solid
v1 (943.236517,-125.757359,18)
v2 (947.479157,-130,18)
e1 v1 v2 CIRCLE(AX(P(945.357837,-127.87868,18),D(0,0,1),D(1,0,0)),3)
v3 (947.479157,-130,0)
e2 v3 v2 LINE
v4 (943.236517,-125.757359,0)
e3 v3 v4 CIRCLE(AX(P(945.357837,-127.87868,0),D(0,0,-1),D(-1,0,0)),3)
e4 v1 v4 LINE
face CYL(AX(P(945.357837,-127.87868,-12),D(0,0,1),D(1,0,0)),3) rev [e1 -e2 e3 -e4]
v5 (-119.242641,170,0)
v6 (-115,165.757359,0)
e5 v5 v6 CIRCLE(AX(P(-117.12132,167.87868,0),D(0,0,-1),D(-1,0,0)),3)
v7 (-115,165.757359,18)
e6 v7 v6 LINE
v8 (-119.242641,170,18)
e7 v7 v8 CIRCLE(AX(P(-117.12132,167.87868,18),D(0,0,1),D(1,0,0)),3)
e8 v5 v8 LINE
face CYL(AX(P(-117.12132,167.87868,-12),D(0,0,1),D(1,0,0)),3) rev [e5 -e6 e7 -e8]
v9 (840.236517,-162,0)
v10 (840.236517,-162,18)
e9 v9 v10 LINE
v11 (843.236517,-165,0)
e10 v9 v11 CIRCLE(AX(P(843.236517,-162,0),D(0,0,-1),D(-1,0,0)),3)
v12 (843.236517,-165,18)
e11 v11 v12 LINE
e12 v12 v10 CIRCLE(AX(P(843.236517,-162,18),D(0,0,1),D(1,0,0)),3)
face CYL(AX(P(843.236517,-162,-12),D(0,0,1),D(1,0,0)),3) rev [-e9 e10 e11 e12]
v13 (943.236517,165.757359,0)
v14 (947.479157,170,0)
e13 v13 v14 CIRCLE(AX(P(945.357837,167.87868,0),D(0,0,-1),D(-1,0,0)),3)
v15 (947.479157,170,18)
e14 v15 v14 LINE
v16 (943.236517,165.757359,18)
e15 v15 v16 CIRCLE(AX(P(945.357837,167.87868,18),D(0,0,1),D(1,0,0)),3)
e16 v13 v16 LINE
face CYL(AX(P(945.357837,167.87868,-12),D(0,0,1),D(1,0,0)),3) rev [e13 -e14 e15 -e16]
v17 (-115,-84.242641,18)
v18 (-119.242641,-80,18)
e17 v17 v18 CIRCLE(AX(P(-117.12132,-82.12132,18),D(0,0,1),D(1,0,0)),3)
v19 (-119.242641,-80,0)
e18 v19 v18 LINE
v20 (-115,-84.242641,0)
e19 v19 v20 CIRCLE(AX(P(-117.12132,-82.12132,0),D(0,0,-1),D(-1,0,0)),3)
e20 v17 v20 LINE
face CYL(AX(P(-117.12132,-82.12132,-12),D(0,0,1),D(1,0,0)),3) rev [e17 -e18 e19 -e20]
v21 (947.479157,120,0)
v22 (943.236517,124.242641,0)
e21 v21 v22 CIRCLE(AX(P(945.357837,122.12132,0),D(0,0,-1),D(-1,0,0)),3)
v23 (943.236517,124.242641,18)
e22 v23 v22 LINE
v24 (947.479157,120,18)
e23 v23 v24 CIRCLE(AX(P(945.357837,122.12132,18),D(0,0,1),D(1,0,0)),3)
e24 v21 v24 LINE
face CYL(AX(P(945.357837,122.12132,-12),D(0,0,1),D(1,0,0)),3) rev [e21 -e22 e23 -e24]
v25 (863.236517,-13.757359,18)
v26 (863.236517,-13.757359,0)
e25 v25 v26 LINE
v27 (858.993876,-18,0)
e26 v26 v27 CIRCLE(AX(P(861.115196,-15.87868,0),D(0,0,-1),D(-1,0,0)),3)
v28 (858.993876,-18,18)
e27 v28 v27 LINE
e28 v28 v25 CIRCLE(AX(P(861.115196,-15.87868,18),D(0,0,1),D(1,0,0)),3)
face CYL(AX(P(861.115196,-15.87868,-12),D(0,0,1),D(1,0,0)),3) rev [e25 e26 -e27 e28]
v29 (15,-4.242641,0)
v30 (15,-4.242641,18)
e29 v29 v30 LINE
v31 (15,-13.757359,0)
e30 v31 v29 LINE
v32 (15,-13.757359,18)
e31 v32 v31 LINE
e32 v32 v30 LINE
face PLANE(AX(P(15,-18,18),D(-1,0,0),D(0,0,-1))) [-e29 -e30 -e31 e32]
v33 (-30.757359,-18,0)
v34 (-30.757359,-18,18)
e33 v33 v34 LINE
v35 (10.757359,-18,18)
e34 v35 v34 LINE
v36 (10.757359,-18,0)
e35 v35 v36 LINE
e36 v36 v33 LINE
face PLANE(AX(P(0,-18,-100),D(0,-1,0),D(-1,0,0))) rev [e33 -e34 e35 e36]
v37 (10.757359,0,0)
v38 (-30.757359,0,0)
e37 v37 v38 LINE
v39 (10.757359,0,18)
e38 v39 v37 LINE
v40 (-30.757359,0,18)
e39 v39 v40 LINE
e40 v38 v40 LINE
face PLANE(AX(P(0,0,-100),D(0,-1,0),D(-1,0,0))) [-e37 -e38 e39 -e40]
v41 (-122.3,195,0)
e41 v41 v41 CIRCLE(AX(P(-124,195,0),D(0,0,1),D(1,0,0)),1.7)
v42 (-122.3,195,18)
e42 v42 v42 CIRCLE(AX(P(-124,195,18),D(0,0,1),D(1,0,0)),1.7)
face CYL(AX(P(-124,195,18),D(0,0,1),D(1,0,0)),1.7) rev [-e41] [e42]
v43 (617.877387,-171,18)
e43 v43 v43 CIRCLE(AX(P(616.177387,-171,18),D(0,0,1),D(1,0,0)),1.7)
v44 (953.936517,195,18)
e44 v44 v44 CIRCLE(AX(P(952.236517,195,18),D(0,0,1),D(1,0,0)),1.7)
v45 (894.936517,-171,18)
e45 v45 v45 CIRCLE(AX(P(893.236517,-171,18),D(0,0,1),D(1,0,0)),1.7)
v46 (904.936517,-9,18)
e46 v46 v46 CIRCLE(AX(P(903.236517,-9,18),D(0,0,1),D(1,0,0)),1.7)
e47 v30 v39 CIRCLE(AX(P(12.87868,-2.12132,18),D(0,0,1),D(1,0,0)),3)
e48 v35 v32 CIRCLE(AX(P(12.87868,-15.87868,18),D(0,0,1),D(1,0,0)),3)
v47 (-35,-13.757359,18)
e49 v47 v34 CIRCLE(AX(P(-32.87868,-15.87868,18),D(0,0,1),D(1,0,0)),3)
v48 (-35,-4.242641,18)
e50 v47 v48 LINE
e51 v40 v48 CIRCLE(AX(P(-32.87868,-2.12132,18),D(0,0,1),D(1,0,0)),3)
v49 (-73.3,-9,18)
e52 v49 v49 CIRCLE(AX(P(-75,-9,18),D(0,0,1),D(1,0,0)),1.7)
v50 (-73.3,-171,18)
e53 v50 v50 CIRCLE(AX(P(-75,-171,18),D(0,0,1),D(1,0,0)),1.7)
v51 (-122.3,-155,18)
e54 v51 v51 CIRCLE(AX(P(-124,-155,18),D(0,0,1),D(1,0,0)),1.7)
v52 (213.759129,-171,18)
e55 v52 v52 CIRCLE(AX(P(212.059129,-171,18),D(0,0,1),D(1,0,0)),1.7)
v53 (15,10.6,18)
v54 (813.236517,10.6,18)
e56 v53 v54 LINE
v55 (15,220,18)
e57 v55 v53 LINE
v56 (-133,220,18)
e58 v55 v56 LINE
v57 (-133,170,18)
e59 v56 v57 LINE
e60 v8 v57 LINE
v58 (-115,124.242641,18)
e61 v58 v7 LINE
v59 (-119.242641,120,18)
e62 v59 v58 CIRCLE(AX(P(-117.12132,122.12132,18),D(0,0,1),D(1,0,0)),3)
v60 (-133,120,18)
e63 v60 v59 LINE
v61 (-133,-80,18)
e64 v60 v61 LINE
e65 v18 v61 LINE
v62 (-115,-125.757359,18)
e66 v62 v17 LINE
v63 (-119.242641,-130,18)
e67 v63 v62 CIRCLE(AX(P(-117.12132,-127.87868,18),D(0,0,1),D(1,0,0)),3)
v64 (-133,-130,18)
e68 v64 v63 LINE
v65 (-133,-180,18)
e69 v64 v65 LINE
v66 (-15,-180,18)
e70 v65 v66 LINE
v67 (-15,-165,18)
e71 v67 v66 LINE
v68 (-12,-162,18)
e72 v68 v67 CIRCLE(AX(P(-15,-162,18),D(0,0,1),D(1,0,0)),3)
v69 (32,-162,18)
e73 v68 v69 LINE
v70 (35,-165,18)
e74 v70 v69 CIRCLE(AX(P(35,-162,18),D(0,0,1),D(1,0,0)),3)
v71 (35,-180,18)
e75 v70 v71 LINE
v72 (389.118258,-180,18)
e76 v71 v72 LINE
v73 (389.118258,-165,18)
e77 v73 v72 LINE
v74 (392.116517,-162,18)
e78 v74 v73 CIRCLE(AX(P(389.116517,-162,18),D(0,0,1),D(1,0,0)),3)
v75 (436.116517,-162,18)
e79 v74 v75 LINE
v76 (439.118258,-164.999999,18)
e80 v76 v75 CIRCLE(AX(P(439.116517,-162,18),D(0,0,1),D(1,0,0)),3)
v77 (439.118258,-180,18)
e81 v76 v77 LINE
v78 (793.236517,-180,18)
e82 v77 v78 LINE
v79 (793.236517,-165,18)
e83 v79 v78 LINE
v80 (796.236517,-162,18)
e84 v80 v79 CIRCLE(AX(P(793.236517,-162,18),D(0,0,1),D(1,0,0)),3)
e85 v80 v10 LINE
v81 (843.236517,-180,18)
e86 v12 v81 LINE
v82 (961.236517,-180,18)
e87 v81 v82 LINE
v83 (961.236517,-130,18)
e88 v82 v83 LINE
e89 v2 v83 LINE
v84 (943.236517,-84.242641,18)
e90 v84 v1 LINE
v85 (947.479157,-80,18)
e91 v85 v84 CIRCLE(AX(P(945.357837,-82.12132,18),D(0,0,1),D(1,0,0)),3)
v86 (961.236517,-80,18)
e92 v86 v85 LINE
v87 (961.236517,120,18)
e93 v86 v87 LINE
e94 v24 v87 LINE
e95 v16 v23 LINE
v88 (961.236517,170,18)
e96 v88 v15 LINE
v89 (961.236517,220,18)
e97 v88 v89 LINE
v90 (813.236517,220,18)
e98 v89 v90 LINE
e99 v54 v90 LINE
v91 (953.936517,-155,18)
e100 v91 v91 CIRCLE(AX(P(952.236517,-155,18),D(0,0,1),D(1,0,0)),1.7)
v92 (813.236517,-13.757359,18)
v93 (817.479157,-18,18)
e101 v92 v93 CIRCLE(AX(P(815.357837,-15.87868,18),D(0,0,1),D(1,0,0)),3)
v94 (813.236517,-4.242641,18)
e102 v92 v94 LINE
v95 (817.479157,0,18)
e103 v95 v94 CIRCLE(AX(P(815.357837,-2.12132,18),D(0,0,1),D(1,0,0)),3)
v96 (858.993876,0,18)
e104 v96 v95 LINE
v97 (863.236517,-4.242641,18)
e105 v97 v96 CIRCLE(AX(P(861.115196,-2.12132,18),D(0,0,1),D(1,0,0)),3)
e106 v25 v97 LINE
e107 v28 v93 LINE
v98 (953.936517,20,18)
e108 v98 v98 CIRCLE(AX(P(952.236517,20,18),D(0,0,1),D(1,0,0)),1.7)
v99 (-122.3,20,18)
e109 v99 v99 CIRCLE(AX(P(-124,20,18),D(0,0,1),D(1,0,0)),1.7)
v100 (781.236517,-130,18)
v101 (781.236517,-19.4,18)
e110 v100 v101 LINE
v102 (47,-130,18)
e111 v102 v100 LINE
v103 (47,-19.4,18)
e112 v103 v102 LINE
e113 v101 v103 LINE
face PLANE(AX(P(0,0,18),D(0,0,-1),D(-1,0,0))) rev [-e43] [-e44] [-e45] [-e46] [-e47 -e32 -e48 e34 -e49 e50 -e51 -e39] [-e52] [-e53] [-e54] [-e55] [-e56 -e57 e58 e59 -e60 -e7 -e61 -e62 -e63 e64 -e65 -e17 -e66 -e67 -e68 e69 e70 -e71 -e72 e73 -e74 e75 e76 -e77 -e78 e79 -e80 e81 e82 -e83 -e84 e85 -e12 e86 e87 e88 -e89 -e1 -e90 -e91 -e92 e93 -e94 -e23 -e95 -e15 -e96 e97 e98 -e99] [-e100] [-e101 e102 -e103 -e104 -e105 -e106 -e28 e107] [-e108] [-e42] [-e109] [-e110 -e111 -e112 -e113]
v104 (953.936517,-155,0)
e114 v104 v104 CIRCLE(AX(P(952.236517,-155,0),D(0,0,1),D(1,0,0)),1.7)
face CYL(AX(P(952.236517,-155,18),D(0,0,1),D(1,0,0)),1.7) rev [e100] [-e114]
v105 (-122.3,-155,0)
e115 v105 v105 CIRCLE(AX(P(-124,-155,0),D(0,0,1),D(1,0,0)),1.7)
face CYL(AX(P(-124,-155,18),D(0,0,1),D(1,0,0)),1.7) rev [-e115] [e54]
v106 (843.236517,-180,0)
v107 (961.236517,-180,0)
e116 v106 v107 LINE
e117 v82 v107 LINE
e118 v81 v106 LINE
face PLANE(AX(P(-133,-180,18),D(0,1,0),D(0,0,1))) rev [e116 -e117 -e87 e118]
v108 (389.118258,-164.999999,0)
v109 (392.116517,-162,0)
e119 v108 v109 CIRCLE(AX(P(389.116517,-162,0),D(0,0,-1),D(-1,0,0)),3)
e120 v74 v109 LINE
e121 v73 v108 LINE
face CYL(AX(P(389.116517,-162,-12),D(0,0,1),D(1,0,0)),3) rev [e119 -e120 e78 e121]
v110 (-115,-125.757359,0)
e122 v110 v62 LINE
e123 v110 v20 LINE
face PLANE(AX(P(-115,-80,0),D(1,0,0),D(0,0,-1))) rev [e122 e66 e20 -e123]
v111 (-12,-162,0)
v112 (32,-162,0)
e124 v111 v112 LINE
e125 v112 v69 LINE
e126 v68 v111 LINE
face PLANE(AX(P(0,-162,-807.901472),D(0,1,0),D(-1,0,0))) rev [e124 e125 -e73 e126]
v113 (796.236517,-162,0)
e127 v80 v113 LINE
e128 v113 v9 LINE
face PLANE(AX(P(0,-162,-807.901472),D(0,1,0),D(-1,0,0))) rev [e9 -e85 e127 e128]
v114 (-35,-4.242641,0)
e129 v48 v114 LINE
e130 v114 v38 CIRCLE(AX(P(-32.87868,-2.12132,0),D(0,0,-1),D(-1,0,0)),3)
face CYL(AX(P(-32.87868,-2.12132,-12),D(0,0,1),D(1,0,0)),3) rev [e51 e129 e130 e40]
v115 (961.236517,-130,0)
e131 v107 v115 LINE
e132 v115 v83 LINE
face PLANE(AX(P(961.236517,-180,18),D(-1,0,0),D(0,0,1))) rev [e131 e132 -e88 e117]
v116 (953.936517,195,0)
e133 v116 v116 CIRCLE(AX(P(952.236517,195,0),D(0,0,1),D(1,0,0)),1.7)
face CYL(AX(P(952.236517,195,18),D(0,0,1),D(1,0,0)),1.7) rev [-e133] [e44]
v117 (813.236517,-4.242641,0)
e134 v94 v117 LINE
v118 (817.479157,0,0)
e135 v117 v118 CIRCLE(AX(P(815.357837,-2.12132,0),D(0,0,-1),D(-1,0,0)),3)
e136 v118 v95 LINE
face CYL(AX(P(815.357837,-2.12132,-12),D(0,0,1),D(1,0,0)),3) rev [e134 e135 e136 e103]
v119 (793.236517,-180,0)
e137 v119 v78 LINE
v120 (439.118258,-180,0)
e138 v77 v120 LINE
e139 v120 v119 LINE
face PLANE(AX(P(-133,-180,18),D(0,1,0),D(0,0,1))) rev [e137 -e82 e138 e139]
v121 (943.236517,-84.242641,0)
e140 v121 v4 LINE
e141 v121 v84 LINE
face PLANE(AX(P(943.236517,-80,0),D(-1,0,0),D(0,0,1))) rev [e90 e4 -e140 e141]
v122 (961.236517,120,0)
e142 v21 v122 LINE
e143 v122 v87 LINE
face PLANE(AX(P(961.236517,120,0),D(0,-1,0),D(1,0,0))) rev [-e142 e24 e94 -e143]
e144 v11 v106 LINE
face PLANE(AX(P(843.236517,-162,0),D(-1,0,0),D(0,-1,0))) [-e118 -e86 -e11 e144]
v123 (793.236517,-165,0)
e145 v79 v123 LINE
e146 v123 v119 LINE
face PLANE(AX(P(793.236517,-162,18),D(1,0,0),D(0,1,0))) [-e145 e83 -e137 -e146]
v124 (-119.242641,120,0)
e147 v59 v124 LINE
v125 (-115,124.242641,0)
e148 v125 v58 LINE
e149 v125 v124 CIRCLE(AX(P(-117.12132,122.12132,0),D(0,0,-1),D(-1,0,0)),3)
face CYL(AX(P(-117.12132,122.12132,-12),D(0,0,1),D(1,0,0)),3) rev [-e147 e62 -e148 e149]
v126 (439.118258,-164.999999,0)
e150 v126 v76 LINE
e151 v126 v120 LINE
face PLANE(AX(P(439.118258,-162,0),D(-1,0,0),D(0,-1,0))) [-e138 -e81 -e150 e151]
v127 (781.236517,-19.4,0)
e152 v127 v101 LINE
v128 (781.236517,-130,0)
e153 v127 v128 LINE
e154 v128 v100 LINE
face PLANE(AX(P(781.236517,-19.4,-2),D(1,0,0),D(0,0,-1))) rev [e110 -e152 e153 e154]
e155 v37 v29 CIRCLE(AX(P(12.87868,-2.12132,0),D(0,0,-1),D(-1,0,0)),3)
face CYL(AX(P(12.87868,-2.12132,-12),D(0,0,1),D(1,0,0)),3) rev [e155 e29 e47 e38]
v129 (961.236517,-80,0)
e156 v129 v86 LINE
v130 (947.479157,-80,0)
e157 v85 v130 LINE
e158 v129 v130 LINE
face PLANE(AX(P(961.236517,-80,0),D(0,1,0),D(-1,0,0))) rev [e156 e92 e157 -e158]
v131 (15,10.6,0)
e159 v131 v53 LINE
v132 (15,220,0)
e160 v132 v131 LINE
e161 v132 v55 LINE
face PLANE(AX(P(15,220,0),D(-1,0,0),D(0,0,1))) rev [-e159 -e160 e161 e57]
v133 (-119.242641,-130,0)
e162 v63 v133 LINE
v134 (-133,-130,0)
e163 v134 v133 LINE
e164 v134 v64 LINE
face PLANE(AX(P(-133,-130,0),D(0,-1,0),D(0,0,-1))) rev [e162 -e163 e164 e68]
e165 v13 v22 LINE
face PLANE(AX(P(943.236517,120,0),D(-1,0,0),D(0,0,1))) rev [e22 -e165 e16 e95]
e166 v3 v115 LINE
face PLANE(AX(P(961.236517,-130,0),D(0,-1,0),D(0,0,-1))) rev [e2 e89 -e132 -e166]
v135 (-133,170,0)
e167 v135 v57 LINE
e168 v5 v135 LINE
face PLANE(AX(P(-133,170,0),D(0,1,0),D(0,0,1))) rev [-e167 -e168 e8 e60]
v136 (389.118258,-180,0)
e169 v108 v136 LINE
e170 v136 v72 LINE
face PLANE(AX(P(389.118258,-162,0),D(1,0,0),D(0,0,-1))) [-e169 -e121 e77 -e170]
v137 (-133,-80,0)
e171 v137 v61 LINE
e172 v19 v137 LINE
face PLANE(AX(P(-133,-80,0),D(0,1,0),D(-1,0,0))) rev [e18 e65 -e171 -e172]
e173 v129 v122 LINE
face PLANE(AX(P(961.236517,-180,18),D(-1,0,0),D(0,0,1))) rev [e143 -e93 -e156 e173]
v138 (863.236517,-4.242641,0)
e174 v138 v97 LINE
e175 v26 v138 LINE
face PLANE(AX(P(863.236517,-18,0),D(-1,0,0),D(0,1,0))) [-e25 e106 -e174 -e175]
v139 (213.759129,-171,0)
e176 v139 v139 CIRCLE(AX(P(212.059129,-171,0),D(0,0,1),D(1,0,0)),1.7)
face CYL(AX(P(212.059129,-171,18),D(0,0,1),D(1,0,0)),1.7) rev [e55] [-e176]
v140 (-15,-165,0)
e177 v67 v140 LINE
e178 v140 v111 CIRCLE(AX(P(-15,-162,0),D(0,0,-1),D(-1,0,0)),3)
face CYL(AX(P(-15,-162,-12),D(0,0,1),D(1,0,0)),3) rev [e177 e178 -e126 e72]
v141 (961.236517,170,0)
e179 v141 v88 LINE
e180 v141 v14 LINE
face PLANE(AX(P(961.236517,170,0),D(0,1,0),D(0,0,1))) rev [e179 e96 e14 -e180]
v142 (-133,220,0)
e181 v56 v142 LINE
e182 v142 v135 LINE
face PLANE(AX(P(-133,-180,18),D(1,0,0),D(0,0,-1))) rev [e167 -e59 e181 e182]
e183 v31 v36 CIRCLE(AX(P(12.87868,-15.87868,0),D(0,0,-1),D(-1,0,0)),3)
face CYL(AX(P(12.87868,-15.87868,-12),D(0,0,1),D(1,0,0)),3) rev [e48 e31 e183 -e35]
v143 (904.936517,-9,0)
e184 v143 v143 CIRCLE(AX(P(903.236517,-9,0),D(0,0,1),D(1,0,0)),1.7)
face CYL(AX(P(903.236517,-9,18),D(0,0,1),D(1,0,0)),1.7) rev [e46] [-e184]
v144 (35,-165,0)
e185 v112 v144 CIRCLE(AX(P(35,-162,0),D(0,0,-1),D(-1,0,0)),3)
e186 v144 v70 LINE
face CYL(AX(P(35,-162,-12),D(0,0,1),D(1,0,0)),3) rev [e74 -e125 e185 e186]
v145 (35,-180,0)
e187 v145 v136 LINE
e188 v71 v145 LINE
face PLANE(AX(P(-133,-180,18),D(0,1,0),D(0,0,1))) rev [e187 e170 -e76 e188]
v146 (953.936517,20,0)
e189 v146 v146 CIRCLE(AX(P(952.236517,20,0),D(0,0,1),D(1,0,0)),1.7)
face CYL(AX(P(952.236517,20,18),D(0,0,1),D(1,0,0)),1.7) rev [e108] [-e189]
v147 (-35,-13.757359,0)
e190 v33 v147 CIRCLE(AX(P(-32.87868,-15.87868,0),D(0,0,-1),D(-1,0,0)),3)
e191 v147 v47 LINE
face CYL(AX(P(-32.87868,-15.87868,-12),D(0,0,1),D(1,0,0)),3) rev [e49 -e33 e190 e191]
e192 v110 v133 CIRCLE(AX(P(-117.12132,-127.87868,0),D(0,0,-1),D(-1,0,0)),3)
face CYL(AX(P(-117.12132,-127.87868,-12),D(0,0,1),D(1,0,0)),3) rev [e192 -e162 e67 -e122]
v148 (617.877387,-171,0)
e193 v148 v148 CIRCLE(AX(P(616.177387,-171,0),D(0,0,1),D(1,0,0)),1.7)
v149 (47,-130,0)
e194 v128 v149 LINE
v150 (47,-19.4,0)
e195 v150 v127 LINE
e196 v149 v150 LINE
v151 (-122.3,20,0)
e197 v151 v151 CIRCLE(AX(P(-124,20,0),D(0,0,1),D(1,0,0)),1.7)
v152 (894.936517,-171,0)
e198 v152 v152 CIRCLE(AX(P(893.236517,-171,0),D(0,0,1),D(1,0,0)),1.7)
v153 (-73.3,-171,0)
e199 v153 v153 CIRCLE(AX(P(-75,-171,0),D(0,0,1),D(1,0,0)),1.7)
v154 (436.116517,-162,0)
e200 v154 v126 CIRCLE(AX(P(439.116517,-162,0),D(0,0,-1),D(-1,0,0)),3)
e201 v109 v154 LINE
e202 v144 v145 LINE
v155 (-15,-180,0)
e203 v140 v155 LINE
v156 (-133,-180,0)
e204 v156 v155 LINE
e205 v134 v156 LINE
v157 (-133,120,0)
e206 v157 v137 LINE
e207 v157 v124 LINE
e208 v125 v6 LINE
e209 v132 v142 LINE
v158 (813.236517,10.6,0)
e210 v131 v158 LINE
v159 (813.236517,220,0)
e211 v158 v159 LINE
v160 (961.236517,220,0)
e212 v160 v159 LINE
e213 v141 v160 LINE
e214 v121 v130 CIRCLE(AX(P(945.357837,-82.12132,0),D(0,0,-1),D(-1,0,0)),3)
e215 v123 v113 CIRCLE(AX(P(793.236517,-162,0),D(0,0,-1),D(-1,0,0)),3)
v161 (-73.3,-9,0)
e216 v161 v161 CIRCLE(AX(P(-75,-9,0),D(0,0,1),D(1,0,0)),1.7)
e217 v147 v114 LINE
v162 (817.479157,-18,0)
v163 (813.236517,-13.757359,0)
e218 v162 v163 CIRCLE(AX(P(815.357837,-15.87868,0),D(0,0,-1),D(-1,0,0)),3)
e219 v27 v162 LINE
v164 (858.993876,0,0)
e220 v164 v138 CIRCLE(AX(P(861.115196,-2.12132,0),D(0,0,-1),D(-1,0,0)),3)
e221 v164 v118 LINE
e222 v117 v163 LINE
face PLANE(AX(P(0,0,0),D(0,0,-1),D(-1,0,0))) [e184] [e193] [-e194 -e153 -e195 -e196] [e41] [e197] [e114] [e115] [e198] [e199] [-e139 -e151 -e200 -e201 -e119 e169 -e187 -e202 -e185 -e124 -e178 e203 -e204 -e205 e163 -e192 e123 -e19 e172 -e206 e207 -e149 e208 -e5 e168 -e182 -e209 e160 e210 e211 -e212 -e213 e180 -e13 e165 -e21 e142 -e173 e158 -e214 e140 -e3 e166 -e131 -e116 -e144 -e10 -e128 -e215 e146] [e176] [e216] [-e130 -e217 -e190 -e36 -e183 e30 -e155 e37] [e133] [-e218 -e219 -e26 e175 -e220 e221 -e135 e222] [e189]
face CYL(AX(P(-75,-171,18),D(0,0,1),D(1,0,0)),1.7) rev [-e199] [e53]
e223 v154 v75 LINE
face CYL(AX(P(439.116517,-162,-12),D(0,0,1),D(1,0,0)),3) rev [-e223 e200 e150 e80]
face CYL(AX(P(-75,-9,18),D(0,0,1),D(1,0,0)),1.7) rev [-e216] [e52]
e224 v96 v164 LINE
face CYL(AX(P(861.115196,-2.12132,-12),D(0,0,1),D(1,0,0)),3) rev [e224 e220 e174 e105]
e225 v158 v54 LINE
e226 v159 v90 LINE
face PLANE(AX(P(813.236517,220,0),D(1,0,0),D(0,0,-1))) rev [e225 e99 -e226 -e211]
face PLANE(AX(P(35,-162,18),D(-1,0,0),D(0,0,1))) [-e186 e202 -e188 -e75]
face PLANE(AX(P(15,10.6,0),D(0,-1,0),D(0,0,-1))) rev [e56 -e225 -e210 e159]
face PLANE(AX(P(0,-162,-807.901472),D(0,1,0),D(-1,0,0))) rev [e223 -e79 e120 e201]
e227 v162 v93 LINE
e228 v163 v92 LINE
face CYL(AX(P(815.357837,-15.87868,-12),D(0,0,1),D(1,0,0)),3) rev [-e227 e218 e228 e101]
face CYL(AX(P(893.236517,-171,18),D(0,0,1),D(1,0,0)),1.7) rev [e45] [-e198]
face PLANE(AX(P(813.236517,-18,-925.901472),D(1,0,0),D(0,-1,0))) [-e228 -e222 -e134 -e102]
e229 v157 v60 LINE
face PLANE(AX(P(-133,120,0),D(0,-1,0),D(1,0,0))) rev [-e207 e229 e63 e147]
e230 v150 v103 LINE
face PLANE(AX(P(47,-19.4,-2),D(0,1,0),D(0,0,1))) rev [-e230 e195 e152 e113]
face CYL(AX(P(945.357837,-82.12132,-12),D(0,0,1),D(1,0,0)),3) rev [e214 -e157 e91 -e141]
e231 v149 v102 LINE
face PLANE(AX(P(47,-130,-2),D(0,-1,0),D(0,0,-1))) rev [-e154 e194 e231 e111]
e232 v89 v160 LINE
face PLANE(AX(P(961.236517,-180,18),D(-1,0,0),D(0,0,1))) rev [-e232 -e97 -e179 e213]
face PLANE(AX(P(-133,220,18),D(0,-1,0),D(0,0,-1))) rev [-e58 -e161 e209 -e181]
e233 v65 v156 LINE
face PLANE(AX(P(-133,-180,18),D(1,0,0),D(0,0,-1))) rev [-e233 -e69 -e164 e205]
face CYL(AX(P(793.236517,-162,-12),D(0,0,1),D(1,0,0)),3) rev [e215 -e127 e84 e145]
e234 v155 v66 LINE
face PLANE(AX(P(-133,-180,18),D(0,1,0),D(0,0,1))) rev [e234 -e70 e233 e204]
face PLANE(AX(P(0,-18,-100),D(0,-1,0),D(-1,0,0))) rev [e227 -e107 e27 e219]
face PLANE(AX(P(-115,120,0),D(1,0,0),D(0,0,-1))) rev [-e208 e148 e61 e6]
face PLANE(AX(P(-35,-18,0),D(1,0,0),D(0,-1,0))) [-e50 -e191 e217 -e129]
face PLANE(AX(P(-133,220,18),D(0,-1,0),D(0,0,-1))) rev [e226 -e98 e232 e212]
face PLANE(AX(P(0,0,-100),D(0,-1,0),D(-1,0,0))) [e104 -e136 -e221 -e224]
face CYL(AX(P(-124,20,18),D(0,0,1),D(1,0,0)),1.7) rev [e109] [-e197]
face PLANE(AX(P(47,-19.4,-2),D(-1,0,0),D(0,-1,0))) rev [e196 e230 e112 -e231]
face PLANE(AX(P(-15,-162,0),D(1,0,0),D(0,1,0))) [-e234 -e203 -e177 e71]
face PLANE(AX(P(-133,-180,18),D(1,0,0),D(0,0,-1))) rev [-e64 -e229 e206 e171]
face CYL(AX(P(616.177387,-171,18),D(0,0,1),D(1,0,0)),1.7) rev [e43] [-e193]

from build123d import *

# Parameters (mm, degrees)
SKETCH1_W            = 1094.236516538
SKETCH1_H            = 400
BOSS_EXTRUDE1_DEPTH  = 18
CAVITY1_START        = -15
CAVITY1_OUTLINE_W    = 18
CAVITY1_OUTLINE_H    = 18
CAVITY1_DEPTH        = 30
CAVITY1_START_2      = 813.236516538
CAVITY1_2_OUTLINE_W  = 18
CAVITY1_2_OUTLINE_H  = 18
CAVITY1_2_DEPTH      = 30
CAVITY1_START_3      = 389.118258269
CAVITY1_3_OUTLINE_W  = 18
CAVITY1_3_OUTLINE_H  = 18
CAVITY1_3_DEPTH      = 50
CAVITY1_START_4      = -35
CAVITY1_4_OUTLINE_W  = 18
CAVITY1_4_OUTLINE_H  = 18
CAVITY1_4_DEPTH      = 20
CAVITY1_START_5      = 15
CAVITY1_5_OUTLINE_W  = 18
CAVITY1_5_OUTLINE_H  = 18
CAVITY1_5_DEPTH      = 20
CAVITY1_START_6      = 793.236516538
CAVITY1_6_OUTLINE_W  = 18
CAVITY1_6_OUTLINE_H  = 18
CAVITY1_6_DEPTH      = 20
CAVITY1_START_7      = 843.236516538
CAVITY1_7_OUTLINE_W  = 18
CAVITY1_7_OUTLINE_H  = 18
CAVITY1_7_DEPTH      = 20
SKETCH2_W            = 18
SKETCH2_H            = 50
CUT_EXTRUDE1_DEPTH   = 987.255362837
SKETCH3_W            = 798.236516538
SKETCH3_H            = 209.4
CUT_EXTRUDE2_DEPTH   = 18
SKETCH4_W            = 734.236516538
SKETCH4_H            = 110.6
CUT_EXTRUDE3_DEPTH   = 20
M3_CLEARANCE_HOLE1_D = 3.4
SKETCH7_R            = 3
CUT_EXTRUDE4_DEPTH   = 30


# Read off the part's stored shape, not the designer's step: Cavity1
with BuildPart() as part:
    # Sketch1 → Boss-Extrude1 (new body)
    with BuildSketch(Plane.XY):
        with Locations((414.118258269, 20)):
            Rectangle(SKETCH1_W, SKETCH1_H)
    extrude(amount=BOSS_EXTRUDE1_DEPTH)

    # Cavity1 outline → Cavity1 (cut)
    with BuildSketch(Plane.YZ.offset(CAVITY1_START)):
        with Locations((-9, 9)):
            Rectangle(CAVITY1_OUTLINE_W, CAVITY1_OUTLINE_H)
        with Locations((-171, 9)):
            Rectangle(CAVITY1_OUTLINE_W, CAVITY1_OUTLINE_H)
    extrude(amount=CAVITY1_DEPTH, mode=Mode.SUBTRACT)

    # Cavity1 2 outline → Cavity1 2 (cut)
    with BuildSketch(Plane.YZ.offset(CAVITY1_START_2)):
        with Locations((-9, 9)):
            Rectangle(CAVITY1_2_OUTLINE_W, CAVITY1_2_OUTLINE_H)
        with Locations((-171, 9)):
            Rectangle(CAVITY1_2_OUTLINE_W, CAVITY1_2_OUTLINE_H)
    extrude(amount=CAVITY1_2_DEPTH, mode=Mode.SUBTRACT)

    # Cavity1 3 outline → Cavity1 3 (cut)
    with BuildSketch(Plane.YZ.offset(CAVITY1_START_3)):
        with Locations((-171, 9)):
            Rectangle(CAVITY1_3_OUTLINE_W, CAVITY1_3_OUTLINE_H)
    extrude(amount=CAVITY1_3_DEPTH, mode=Mode.SUBTRACT)

    # Cavity1 4 outline → Cavity1 4 (cut)
    with BuildSketch(Plane.YZ.offset(CAVITY1_START_4)):
        with Locations((-9, 9)):
            Rectangle(CAVITY1_4_OUTLINE_W, CAVITY1_4_OUTLINE_H)
    extrude(amount=CAVITY1_4_DEPTH, mode=Mode.SUBTRACT)

    # Cavity1 5 outline → Cavity1 5 (cut)
    with BuildSketch(Plane.YZ.offset(CAVITY1_START_5)):
        with Locations((-171, 9)):
            Rectangle(CAVITY1_5_OUTLINE_W, CAVITY1_5_OUTLINE_H)
    extrude(amount=CAVITY1_5_DEPTH, mode=Mode.SUBTRACT)

    # Cavity1 6 outline → Cavity1 6 (cut)
    with BuildSketch(Plane.YZ.offset(CAVITY1_START_6)):
        with Locations((-171, 9)):
            Rectangle(CAVITY1_6_OUTLINE_W, CAVITY1_6_OUTLINE_H)
    extrude(amount=CAVITY1_6_DEPTH, mode=Mode.SUBTRACT)

    # Cavity1 7 outline → Cavity1 7 (cut)
    with BuildSketch(Plane.YZ.offset(CAVITY1_START_7)):
        with Locations((-9, 9)):
            Rectangle(CAVITY1_7_OUTLINE_W, CAVITY1_7_OUTLINE_H)
    extrude(amount=CAVITY1_7_DEPTH, mode=Mode.SUBTRACT)

    # Sketch2 → Cut-Extrude1 (cut, through all)
    with BuildSketch(Plane.XY.offset(18)):
        with Locations((952.236516538, 145)):
            Rectangle(SKETCH2_W, SKETCH2_H)
        with Locations((952.236516538, -105)):
            Rectangle(SKETCH2_W, SKETCH2_H)
        with Locations((-124, -105)):
            Rectangle(SKETCH2_W, SKETCH2_H)
        with Locations((-124, 145)):
            Rectangle(SKETCH2_W, SKETCH2_H)
    extrude(amount=-CUT_EXTRUDE1_DEPTH, mode=Mode.SUBTRACT)

    # Sketch3 → Cut-Extrude2 (cut)
    with BuildSketch(Plane.XY.offset(18)):
        with Locations((414.118258269, 115.3)):
            Rectangle(SKETCH3_W, SKETCH3_H)
    extrude(amount=-CUT_EXTRUDE2_DEPTH, mode=Mode.SUBTRACT)

    # Sketch4 → Cut-Extrude3 (cut)
    with BuildSketch(Plane.XY.offset(18)):
        with Locations((414.118258269, -74.7)):
            Rectangle(SKETCH4_W, SKETCH4_H)
    extrude(amount=-CUT_EXTRUDE3_DEPTH, mode=Mode.SUBTRACT)

    # M3 Clearance Hole1 (through all)
    with Locations(Plane.XY.offset(18)):
        with Locations((-75, -9), (903.236516538, -9), (-75, -171), (212.059129134, -171), (616.177387403, -171), (893.236516538, -171), (952.236516538, -155), (952.236516538, 20), (952.236516538, 195), (-124, -155), (-124, 20), (-124, 195)):
            Hole(M3_CLEARANCE_HOLE1_D / 2)

    # Sketch7 → Cut-Extrude4 (cut)
    with BuildSketch(Plane.XY.offset(18)):
        with Locations((945.357836881, 122.121320344)):
            Circle(SKETCH7_R)
        with Locations((945.357836881, 167.878679656)):
            Circle(SKETCH7_R)
        with Locations((861.115196194, -15.878679656)):
            Circle(SKETCH7_R)
        with Locations((861.115196194, -2.121320344)):
            Circle(SKETCH7_R)
        with Locations((815.357836881, -2.121320344)):
            Circle(SKETCH7_R)
        with Locations((815.357836881, -15.878679656)):
            Circle(SKETCH7_R)
        with Locations((945.357836881, -127.878679656)):
            Circle(SKETCH7_R)
        with Locations((945.357836881, -82.121320344)):
            Circle(SKETCH7_R)
        with Locations((-117.121320344, 167.878679656)):
            Circle(SKETCH7_R)
        with Locations((-117.121320344, 122.121320344)):
            Circle(SKETCH7_R)
        with Locations((-117.121320344, -82.121320344)):
            Circle(SKETCH7_R)
        with Locations((-117.121320344, -127.878679656)):
            Circle(SKETCH7_R)
        with Locations((-32.878679656, -2.121320344)):
            Circle(SKETCH7_R)
        with Locations((-32.878679656, -15.878679656)):
            Circle(SKETCH7_R)
        with Locations((12.878679656, -15.878679656)):
            Circle(SKETCH7_R)
        with Locations((12.878679656, -2.121320344)):
            Circle(SKETCH7_R)
        with Locations((-15, -162)):
            Circle(SKETCH7_R)
        with Locations((35, -162)):
            Circle(SKETCH7_R)
        with Locations((793.236516538, -162)):
            Circle(SKETCH7_R)
        with Locations((843.236516538, -162)):
            Circle(SKETCH7_R)
        with Locations((389.116516538, -162)):
            Circle(SKETCH7_R)
        with Locations((439.116516538, -162)):
            Circle(SKETCH7_R)
    extrude(amount=-CUT_EXTRUDE4_DEPTH, mode=Mode.SUBTRACT)


solid = part.part
